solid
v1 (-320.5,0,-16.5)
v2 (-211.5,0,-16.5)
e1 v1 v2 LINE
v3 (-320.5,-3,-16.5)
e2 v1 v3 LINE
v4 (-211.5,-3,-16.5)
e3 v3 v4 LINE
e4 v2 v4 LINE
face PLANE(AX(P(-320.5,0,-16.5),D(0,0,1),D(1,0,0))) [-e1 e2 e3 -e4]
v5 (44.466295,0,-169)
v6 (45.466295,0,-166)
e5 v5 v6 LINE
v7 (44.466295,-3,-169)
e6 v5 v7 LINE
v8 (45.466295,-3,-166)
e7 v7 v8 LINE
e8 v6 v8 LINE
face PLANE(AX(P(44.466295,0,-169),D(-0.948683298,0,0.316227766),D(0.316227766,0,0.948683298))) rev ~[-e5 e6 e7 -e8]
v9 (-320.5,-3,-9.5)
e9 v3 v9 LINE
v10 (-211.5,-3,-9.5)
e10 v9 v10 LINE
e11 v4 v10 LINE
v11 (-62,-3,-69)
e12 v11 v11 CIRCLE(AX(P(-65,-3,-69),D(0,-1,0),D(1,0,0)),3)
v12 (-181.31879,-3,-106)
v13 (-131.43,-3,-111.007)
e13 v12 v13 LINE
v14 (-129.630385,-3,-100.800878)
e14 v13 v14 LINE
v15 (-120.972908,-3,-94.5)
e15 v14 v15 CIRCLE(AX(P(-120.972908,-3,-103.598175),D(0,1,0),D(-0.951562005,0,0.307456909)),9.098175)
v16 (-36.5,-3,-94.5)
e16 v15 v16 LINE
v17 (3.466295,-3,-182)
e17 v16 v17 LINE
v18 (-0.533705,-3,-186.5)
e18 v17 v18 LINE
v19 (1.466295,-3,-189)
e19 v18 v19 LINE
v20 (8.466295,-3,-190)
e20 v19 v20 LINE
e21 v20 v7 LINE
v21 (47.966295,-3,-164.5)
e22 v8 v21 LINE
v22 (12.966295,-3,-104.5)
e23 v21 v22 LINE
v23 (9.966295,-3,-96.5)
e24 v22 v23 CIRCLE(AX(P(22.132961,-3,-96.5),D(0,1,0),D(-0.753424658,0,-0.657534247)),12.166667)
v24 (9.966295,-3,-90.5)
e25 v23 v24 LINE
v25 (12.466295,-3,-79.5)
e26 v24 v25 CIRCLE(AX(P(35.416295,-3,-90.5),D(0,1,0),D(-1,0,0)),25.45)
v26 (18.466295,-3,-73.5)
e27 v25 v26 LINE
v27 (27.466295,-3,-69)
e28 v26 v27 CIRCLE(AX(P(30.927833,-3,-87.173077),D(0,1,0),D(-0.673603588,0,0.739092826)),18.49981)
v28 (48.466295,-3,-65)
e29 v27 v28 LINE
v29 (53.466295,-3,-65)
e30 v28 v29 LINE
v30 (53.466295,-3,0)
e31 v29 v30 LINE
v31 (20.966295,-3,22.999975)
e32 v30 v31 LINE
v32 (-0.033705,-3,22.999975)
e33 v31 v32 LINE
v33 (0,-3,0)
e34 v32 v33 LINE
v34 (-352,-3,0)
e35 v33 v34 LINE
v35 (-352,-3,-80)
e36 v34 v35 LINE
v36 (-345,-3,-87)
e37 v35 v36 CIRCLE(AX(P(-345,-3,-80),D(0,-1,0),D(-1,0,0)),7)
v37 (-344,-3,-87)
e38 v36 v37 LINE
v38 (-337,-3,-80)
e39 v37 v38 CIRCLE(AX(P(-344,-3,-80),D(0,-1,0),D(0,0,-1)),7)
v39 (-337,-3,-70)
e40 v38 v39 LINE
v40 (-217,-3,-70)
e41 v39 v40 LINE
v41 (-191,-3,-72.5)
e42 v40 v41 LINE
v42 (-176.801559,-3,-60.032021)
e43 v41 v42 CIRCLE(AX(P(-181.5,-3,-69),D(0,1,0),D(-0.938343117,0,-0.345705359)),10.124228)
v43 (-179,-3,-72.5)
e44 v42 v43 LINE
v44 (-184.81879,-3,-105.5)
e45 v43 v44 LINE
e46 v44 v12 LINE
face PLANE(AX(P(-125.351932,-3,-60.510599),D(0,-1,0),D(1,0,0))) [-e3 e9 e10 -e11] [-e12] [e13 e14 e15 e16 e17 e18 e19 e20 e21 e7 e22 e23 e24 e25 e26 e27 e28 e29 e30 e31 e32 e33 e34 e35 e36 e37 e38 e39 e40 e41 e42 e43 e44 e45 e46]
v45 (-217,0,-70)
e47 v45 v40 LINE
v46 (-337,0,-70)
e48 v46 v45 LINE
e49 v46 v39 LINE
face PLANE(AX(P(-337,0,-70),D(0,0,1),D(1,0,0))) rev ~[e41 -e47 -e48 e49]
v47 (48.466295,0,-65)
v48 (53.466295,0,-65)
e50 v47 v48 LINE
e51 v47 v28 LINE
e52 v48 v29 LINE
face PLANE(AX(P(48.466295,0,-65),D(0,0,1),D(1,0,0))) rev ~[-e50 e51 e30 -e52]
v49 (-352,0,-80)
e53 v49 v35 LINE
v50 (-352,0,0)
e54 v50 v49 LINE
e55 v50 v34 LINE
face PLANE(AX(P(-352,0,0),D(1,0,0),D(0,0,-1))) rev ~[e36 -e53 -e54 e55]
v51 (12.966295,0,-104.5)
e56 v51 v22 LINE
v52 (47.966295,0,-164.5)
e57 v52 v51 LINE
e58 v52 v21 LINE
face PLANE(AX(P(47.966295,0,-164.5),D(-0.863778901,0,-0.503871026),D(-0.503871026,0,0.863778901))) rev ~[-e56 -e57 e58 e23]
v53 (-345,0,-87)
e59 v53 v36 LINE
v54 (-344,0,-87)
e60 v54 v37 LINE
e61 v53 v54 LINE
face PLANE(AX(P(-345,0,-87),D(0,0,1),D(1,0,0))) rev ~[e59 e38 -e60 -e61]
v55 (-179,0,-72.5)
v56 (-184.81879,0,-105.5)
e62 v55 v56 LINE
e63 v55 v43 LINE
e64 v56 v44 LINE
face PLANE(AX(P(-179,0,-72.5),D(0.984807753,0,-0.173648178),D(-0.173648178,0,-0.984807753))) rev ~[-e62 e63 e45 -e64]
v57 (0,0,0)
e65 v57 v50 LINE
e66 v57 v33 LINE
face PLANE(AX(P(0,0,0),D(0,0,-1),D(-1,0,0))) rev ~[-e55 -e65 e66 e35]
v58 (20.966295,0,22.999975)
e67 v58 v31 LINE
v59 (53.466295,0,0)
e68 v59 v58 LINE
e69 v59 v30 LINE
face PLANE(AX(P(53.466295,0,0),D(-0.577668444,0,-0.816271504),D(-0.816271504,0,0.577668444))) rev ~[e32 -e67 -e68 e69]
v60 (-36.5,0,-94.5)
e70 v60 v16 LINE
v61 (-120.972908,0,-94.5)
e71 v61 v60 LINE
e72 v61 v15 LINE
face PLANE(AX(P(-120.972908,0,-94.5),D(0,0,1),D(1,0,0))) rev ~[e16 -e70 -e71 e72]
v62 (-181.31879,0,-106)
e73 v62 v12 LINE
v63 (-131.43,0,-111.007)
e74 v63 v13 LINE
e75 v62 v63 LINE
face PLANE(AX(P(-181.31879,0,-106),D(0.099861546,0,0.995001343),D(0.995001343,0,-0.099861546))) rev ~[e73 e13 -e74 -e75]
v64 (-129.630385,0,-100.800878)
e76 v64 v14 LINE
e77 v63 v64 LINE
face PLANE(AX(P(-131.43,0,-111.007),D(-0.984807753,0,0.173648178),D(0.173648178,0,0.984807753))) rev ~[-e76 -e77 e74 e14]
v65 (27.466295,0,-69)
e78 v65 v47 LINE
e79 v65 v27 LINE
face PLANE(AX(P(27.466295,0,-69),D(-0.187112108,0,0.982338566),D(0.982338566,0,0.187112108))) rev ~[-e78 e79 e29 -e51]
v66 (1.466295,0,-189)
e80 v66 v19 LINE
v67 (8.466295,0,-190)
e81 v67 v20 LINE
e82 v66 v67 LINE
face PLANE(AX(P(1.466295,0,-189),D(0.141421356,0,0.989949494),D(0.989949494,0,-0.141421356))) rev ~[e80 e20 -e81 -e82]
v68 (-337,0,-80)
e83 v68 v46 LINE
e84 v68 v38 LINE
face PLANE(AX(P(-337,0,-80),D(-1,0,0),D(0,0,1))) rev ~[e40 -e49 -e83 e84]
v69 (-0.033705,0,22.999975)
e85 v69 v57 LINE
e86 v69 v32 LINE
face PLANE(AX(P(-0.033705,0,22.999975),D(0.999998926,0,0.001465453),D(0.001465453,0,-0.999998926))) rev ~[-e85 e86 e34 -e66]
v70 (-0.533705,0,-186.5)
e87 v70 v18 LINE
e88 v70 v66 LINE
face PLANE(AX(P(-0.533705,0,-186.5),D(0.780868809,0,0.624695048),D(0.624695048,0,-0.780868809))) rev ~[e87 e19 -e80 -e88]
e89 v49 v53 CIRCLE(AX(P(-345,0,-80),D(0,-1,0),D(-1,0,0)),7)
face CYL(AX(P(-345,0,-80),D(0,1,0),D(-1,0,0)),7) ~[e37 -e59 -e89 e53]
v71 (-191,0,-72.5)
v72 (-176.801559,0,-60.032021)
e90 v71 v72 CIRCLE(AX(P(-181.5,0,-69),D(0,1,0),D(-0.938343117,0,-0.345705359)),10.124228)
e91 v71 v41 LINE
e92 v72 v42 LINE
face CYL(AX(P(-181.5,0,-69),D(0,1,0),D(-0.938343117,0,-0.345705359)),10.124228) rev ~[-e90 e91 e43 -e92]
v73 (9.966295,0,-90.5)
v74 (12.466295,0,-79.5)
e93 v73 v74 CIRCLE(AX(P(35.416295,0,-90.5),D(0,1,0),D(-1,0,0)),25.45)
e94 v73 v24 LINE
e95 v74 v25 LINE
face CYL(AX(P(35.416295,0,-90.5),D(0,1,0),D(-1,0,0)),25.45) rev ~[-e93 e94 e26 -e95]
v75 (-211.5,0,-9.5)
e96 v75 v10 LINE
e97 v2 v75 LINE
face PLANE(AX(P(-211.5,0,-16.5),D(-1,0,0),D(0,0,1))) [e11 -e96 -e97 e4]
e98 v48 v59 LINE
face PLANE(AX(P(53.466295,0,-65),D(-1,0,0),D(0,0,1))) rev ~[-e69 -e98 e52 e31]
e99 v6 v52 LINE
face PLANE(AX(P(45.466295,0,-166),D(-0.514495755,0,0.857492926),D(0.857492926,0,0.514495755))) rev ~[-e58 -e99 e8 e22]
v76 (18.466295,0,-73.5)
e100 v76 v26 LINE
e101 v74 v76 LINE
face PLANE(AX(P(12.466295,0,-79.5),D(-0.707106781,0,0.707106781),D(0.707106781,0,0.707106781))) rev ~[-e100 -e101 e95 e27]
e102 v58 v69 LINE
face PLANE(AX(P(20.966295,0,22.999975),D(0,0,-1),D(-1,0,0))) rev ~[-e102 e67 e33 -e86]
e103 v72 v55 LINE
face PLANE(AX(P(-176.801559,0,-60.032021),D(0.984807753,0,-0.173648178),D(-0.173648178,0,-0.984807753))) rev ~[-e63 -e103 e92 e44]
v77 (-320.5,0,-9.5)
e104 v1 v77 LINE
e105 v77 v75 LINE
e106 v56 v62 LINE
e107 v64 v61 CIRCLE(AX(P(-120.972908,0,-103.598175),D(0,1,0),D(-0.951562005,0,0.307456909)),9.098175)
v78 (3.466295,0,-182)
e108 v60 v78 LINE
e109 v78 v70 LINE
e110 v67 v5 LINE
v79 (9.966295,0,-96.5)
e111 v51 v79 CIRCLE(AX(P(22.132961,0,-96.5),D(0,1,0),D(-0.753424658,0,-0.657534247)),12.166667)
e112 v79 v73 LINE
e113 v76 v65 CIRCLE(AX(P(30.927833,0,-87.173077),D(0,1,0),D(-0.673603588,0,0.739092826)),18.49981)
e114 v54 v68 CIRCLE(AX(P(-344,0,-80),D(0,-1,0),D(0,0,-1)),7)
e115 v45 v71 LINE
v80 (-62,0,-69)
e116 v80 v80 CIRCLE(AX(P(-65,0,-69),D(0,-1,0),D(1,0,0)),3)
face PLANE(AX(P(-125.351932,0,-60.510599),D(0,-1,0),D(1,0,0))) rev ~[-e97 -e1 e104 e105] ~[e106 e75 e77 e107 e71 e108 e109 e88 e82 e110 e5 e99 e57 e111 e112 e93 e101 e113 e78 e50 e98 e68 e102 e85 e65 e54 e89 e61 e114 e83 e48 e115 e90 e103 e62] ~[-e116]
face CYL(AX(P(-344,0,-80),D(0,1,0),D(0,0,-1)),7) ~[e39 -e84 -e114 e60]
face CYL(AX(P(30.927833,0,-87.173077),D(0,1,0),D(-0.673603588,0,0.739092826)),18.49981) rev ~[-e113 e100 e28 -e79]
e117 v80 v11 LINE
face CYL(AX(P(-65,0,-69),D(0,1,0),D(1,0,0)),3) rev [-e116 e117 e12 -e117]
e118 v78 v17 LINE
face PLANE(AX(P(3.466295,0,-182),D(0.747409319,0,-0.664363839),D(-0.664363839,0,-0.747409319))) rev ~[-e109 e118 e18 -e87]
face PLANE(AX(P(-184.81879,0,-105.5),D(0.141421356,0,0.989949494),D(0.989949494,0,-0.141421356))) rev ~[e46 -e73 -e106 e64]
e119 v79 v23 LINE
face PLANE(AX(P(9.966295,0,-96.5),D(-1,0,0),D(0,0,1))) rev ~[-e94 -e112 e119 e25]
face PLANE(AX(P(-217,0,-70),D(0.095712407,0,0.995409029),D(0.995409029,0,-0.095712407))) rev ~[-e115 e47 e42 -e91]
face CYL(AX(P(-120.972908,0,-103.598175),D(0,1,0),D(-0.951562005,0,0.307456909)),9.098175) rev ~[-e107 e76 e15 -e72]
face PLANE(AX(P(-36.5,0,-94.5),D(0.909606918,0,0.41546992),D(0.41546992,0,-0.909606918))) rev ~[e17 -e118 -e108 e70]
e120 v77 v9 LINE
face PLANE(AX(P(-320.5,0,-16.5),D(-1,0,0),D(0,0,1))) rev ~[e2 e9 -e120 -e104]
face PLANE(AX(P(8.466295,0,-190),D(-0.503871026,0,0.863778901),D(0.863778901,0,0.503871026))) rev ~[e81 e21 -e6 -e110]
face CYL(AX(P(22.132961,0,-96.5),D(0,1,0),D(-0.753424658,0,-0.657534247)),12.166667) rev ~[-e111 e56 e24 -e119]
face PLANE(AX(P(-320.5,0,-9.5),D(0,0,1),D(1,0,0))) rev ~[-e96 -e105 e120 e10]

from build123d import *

# Parameters (mm, degrees)
F0_W     = 109
F0_H     = 7
F0_R     = 3
F1_DEPTH = 3


# Not quite as in the source:
# - a feature names something its author has since deleted; it is built from what else it names


with BuildPart() as f1:
    # F0 (on Front) → F1 (new body)
    with BuildSketch(Plane.XZ):
        with BuildLine():
            Line((48.4662945779, -65), (53.4662945779, -65))
            Line((53.4662945779, -65), (53.4662945779, 0))
            Line((53.4662945779, 0), (20.9662945779, 22.9999753031))
            Line((20.9662945779, 22.9999753031), (-0.0337054221, 22.9999753031))
            Line((-0.0337054221, 22.9999753031), (0, 0))
            Line((0, 0), (-352, 0))
            Line((-352, 0), (-352, -39))
            Line((-352, -39), (-352, -55.5))
            Line((-352, -55.5), (-352, -80))
            ThreePointArc((-352, -80), (-349.9497474683, -84.9497474683), (-345, -87))
            Line((-345, -87), (-344, -87))
            ThreePointArc((-344, -87), (-339.0502525317, -84.9497474683), (-337, -80))
            Line((-337, -80), (-337, -70))
            Line((-337, -70), (-217, -70))
            Line((-217, -70), (-191, -72.5))
            ThreePointArc((-191, -72.5), (-188.1802970177, -61.3925278998), (-176.8015588718, -60.0320207981))
            Line((-176.8015588718, -60.0320207981), (-179, -72.5))
            Line((-179, -72.5), (-184.8187903634, -105.5))
            Line((-184.8187903634, -105.5), (-181.3187903634, -106))
            Line((-181.3187903634, -106), (-131.43, -111.007))
            Line((-131.43, -111.007), (-129.63038537, -100.8008782668))
            ThreePointArc((-129.63038537, -100.8008782668), (-126.3267144318, -96.2419842885), (-120.9729076822, -94.5))
            Line((-120.9729076822, -94.5), (-97.5, -94.5))
            Line((-97.5, -94.5), (-36.5, -94.5))
            Line((-36.5, -94.5), (3.4662945779, -182))
            Line((3.4662945779, -182), (-0.5337054221, -186.5))
            Line((-0.5337054221, -186.5), (1.4662945779, -189))
            Line((1.4662945779, -189), (8.4662945779, -190))
            Line((8.4662945779, -190), (44.4662945779, -169))
            Line((44.4662945779, -169), (45.4662945779, -166))
            Line((45.4662945779, -166), (47.9662945779, -164.5))
            Line((47.9662945779, -164.5), (12.9662945779, -104.5))
            ThreePointArc((12.9662945779, -104.5), (10.7409562508, -100.7720018727), (9.9662945779, -96.5))
            Line((9.9662945779, -96.5), (9.9662945779, -90.5))
            ThreePointArc((9.9662945779, -90.5), (10.599163398, -84.8597429137), (12.4662945779, -79.5))
            Line((12.4662945779, -79.5), (18.4662945779, -73.5))
            ThreePointArc((18.4662945779, -73.5), (22.6544664529, -70.6263437501), (27.4662945779, -69))
            Line((27.4662945779, -69), (48.4662945779, -65))
        make_face()
        with Locations((-266, -13)):
            Rectangle(F0_W, F0_H, mode=Mode.SUBTRACT)
        with Locations((-65, -69)):
            Circle(F0_R, mode=Mode.SUBTRACT)
    extrude(amount=F1_DEPTH)


solid = f1.part
